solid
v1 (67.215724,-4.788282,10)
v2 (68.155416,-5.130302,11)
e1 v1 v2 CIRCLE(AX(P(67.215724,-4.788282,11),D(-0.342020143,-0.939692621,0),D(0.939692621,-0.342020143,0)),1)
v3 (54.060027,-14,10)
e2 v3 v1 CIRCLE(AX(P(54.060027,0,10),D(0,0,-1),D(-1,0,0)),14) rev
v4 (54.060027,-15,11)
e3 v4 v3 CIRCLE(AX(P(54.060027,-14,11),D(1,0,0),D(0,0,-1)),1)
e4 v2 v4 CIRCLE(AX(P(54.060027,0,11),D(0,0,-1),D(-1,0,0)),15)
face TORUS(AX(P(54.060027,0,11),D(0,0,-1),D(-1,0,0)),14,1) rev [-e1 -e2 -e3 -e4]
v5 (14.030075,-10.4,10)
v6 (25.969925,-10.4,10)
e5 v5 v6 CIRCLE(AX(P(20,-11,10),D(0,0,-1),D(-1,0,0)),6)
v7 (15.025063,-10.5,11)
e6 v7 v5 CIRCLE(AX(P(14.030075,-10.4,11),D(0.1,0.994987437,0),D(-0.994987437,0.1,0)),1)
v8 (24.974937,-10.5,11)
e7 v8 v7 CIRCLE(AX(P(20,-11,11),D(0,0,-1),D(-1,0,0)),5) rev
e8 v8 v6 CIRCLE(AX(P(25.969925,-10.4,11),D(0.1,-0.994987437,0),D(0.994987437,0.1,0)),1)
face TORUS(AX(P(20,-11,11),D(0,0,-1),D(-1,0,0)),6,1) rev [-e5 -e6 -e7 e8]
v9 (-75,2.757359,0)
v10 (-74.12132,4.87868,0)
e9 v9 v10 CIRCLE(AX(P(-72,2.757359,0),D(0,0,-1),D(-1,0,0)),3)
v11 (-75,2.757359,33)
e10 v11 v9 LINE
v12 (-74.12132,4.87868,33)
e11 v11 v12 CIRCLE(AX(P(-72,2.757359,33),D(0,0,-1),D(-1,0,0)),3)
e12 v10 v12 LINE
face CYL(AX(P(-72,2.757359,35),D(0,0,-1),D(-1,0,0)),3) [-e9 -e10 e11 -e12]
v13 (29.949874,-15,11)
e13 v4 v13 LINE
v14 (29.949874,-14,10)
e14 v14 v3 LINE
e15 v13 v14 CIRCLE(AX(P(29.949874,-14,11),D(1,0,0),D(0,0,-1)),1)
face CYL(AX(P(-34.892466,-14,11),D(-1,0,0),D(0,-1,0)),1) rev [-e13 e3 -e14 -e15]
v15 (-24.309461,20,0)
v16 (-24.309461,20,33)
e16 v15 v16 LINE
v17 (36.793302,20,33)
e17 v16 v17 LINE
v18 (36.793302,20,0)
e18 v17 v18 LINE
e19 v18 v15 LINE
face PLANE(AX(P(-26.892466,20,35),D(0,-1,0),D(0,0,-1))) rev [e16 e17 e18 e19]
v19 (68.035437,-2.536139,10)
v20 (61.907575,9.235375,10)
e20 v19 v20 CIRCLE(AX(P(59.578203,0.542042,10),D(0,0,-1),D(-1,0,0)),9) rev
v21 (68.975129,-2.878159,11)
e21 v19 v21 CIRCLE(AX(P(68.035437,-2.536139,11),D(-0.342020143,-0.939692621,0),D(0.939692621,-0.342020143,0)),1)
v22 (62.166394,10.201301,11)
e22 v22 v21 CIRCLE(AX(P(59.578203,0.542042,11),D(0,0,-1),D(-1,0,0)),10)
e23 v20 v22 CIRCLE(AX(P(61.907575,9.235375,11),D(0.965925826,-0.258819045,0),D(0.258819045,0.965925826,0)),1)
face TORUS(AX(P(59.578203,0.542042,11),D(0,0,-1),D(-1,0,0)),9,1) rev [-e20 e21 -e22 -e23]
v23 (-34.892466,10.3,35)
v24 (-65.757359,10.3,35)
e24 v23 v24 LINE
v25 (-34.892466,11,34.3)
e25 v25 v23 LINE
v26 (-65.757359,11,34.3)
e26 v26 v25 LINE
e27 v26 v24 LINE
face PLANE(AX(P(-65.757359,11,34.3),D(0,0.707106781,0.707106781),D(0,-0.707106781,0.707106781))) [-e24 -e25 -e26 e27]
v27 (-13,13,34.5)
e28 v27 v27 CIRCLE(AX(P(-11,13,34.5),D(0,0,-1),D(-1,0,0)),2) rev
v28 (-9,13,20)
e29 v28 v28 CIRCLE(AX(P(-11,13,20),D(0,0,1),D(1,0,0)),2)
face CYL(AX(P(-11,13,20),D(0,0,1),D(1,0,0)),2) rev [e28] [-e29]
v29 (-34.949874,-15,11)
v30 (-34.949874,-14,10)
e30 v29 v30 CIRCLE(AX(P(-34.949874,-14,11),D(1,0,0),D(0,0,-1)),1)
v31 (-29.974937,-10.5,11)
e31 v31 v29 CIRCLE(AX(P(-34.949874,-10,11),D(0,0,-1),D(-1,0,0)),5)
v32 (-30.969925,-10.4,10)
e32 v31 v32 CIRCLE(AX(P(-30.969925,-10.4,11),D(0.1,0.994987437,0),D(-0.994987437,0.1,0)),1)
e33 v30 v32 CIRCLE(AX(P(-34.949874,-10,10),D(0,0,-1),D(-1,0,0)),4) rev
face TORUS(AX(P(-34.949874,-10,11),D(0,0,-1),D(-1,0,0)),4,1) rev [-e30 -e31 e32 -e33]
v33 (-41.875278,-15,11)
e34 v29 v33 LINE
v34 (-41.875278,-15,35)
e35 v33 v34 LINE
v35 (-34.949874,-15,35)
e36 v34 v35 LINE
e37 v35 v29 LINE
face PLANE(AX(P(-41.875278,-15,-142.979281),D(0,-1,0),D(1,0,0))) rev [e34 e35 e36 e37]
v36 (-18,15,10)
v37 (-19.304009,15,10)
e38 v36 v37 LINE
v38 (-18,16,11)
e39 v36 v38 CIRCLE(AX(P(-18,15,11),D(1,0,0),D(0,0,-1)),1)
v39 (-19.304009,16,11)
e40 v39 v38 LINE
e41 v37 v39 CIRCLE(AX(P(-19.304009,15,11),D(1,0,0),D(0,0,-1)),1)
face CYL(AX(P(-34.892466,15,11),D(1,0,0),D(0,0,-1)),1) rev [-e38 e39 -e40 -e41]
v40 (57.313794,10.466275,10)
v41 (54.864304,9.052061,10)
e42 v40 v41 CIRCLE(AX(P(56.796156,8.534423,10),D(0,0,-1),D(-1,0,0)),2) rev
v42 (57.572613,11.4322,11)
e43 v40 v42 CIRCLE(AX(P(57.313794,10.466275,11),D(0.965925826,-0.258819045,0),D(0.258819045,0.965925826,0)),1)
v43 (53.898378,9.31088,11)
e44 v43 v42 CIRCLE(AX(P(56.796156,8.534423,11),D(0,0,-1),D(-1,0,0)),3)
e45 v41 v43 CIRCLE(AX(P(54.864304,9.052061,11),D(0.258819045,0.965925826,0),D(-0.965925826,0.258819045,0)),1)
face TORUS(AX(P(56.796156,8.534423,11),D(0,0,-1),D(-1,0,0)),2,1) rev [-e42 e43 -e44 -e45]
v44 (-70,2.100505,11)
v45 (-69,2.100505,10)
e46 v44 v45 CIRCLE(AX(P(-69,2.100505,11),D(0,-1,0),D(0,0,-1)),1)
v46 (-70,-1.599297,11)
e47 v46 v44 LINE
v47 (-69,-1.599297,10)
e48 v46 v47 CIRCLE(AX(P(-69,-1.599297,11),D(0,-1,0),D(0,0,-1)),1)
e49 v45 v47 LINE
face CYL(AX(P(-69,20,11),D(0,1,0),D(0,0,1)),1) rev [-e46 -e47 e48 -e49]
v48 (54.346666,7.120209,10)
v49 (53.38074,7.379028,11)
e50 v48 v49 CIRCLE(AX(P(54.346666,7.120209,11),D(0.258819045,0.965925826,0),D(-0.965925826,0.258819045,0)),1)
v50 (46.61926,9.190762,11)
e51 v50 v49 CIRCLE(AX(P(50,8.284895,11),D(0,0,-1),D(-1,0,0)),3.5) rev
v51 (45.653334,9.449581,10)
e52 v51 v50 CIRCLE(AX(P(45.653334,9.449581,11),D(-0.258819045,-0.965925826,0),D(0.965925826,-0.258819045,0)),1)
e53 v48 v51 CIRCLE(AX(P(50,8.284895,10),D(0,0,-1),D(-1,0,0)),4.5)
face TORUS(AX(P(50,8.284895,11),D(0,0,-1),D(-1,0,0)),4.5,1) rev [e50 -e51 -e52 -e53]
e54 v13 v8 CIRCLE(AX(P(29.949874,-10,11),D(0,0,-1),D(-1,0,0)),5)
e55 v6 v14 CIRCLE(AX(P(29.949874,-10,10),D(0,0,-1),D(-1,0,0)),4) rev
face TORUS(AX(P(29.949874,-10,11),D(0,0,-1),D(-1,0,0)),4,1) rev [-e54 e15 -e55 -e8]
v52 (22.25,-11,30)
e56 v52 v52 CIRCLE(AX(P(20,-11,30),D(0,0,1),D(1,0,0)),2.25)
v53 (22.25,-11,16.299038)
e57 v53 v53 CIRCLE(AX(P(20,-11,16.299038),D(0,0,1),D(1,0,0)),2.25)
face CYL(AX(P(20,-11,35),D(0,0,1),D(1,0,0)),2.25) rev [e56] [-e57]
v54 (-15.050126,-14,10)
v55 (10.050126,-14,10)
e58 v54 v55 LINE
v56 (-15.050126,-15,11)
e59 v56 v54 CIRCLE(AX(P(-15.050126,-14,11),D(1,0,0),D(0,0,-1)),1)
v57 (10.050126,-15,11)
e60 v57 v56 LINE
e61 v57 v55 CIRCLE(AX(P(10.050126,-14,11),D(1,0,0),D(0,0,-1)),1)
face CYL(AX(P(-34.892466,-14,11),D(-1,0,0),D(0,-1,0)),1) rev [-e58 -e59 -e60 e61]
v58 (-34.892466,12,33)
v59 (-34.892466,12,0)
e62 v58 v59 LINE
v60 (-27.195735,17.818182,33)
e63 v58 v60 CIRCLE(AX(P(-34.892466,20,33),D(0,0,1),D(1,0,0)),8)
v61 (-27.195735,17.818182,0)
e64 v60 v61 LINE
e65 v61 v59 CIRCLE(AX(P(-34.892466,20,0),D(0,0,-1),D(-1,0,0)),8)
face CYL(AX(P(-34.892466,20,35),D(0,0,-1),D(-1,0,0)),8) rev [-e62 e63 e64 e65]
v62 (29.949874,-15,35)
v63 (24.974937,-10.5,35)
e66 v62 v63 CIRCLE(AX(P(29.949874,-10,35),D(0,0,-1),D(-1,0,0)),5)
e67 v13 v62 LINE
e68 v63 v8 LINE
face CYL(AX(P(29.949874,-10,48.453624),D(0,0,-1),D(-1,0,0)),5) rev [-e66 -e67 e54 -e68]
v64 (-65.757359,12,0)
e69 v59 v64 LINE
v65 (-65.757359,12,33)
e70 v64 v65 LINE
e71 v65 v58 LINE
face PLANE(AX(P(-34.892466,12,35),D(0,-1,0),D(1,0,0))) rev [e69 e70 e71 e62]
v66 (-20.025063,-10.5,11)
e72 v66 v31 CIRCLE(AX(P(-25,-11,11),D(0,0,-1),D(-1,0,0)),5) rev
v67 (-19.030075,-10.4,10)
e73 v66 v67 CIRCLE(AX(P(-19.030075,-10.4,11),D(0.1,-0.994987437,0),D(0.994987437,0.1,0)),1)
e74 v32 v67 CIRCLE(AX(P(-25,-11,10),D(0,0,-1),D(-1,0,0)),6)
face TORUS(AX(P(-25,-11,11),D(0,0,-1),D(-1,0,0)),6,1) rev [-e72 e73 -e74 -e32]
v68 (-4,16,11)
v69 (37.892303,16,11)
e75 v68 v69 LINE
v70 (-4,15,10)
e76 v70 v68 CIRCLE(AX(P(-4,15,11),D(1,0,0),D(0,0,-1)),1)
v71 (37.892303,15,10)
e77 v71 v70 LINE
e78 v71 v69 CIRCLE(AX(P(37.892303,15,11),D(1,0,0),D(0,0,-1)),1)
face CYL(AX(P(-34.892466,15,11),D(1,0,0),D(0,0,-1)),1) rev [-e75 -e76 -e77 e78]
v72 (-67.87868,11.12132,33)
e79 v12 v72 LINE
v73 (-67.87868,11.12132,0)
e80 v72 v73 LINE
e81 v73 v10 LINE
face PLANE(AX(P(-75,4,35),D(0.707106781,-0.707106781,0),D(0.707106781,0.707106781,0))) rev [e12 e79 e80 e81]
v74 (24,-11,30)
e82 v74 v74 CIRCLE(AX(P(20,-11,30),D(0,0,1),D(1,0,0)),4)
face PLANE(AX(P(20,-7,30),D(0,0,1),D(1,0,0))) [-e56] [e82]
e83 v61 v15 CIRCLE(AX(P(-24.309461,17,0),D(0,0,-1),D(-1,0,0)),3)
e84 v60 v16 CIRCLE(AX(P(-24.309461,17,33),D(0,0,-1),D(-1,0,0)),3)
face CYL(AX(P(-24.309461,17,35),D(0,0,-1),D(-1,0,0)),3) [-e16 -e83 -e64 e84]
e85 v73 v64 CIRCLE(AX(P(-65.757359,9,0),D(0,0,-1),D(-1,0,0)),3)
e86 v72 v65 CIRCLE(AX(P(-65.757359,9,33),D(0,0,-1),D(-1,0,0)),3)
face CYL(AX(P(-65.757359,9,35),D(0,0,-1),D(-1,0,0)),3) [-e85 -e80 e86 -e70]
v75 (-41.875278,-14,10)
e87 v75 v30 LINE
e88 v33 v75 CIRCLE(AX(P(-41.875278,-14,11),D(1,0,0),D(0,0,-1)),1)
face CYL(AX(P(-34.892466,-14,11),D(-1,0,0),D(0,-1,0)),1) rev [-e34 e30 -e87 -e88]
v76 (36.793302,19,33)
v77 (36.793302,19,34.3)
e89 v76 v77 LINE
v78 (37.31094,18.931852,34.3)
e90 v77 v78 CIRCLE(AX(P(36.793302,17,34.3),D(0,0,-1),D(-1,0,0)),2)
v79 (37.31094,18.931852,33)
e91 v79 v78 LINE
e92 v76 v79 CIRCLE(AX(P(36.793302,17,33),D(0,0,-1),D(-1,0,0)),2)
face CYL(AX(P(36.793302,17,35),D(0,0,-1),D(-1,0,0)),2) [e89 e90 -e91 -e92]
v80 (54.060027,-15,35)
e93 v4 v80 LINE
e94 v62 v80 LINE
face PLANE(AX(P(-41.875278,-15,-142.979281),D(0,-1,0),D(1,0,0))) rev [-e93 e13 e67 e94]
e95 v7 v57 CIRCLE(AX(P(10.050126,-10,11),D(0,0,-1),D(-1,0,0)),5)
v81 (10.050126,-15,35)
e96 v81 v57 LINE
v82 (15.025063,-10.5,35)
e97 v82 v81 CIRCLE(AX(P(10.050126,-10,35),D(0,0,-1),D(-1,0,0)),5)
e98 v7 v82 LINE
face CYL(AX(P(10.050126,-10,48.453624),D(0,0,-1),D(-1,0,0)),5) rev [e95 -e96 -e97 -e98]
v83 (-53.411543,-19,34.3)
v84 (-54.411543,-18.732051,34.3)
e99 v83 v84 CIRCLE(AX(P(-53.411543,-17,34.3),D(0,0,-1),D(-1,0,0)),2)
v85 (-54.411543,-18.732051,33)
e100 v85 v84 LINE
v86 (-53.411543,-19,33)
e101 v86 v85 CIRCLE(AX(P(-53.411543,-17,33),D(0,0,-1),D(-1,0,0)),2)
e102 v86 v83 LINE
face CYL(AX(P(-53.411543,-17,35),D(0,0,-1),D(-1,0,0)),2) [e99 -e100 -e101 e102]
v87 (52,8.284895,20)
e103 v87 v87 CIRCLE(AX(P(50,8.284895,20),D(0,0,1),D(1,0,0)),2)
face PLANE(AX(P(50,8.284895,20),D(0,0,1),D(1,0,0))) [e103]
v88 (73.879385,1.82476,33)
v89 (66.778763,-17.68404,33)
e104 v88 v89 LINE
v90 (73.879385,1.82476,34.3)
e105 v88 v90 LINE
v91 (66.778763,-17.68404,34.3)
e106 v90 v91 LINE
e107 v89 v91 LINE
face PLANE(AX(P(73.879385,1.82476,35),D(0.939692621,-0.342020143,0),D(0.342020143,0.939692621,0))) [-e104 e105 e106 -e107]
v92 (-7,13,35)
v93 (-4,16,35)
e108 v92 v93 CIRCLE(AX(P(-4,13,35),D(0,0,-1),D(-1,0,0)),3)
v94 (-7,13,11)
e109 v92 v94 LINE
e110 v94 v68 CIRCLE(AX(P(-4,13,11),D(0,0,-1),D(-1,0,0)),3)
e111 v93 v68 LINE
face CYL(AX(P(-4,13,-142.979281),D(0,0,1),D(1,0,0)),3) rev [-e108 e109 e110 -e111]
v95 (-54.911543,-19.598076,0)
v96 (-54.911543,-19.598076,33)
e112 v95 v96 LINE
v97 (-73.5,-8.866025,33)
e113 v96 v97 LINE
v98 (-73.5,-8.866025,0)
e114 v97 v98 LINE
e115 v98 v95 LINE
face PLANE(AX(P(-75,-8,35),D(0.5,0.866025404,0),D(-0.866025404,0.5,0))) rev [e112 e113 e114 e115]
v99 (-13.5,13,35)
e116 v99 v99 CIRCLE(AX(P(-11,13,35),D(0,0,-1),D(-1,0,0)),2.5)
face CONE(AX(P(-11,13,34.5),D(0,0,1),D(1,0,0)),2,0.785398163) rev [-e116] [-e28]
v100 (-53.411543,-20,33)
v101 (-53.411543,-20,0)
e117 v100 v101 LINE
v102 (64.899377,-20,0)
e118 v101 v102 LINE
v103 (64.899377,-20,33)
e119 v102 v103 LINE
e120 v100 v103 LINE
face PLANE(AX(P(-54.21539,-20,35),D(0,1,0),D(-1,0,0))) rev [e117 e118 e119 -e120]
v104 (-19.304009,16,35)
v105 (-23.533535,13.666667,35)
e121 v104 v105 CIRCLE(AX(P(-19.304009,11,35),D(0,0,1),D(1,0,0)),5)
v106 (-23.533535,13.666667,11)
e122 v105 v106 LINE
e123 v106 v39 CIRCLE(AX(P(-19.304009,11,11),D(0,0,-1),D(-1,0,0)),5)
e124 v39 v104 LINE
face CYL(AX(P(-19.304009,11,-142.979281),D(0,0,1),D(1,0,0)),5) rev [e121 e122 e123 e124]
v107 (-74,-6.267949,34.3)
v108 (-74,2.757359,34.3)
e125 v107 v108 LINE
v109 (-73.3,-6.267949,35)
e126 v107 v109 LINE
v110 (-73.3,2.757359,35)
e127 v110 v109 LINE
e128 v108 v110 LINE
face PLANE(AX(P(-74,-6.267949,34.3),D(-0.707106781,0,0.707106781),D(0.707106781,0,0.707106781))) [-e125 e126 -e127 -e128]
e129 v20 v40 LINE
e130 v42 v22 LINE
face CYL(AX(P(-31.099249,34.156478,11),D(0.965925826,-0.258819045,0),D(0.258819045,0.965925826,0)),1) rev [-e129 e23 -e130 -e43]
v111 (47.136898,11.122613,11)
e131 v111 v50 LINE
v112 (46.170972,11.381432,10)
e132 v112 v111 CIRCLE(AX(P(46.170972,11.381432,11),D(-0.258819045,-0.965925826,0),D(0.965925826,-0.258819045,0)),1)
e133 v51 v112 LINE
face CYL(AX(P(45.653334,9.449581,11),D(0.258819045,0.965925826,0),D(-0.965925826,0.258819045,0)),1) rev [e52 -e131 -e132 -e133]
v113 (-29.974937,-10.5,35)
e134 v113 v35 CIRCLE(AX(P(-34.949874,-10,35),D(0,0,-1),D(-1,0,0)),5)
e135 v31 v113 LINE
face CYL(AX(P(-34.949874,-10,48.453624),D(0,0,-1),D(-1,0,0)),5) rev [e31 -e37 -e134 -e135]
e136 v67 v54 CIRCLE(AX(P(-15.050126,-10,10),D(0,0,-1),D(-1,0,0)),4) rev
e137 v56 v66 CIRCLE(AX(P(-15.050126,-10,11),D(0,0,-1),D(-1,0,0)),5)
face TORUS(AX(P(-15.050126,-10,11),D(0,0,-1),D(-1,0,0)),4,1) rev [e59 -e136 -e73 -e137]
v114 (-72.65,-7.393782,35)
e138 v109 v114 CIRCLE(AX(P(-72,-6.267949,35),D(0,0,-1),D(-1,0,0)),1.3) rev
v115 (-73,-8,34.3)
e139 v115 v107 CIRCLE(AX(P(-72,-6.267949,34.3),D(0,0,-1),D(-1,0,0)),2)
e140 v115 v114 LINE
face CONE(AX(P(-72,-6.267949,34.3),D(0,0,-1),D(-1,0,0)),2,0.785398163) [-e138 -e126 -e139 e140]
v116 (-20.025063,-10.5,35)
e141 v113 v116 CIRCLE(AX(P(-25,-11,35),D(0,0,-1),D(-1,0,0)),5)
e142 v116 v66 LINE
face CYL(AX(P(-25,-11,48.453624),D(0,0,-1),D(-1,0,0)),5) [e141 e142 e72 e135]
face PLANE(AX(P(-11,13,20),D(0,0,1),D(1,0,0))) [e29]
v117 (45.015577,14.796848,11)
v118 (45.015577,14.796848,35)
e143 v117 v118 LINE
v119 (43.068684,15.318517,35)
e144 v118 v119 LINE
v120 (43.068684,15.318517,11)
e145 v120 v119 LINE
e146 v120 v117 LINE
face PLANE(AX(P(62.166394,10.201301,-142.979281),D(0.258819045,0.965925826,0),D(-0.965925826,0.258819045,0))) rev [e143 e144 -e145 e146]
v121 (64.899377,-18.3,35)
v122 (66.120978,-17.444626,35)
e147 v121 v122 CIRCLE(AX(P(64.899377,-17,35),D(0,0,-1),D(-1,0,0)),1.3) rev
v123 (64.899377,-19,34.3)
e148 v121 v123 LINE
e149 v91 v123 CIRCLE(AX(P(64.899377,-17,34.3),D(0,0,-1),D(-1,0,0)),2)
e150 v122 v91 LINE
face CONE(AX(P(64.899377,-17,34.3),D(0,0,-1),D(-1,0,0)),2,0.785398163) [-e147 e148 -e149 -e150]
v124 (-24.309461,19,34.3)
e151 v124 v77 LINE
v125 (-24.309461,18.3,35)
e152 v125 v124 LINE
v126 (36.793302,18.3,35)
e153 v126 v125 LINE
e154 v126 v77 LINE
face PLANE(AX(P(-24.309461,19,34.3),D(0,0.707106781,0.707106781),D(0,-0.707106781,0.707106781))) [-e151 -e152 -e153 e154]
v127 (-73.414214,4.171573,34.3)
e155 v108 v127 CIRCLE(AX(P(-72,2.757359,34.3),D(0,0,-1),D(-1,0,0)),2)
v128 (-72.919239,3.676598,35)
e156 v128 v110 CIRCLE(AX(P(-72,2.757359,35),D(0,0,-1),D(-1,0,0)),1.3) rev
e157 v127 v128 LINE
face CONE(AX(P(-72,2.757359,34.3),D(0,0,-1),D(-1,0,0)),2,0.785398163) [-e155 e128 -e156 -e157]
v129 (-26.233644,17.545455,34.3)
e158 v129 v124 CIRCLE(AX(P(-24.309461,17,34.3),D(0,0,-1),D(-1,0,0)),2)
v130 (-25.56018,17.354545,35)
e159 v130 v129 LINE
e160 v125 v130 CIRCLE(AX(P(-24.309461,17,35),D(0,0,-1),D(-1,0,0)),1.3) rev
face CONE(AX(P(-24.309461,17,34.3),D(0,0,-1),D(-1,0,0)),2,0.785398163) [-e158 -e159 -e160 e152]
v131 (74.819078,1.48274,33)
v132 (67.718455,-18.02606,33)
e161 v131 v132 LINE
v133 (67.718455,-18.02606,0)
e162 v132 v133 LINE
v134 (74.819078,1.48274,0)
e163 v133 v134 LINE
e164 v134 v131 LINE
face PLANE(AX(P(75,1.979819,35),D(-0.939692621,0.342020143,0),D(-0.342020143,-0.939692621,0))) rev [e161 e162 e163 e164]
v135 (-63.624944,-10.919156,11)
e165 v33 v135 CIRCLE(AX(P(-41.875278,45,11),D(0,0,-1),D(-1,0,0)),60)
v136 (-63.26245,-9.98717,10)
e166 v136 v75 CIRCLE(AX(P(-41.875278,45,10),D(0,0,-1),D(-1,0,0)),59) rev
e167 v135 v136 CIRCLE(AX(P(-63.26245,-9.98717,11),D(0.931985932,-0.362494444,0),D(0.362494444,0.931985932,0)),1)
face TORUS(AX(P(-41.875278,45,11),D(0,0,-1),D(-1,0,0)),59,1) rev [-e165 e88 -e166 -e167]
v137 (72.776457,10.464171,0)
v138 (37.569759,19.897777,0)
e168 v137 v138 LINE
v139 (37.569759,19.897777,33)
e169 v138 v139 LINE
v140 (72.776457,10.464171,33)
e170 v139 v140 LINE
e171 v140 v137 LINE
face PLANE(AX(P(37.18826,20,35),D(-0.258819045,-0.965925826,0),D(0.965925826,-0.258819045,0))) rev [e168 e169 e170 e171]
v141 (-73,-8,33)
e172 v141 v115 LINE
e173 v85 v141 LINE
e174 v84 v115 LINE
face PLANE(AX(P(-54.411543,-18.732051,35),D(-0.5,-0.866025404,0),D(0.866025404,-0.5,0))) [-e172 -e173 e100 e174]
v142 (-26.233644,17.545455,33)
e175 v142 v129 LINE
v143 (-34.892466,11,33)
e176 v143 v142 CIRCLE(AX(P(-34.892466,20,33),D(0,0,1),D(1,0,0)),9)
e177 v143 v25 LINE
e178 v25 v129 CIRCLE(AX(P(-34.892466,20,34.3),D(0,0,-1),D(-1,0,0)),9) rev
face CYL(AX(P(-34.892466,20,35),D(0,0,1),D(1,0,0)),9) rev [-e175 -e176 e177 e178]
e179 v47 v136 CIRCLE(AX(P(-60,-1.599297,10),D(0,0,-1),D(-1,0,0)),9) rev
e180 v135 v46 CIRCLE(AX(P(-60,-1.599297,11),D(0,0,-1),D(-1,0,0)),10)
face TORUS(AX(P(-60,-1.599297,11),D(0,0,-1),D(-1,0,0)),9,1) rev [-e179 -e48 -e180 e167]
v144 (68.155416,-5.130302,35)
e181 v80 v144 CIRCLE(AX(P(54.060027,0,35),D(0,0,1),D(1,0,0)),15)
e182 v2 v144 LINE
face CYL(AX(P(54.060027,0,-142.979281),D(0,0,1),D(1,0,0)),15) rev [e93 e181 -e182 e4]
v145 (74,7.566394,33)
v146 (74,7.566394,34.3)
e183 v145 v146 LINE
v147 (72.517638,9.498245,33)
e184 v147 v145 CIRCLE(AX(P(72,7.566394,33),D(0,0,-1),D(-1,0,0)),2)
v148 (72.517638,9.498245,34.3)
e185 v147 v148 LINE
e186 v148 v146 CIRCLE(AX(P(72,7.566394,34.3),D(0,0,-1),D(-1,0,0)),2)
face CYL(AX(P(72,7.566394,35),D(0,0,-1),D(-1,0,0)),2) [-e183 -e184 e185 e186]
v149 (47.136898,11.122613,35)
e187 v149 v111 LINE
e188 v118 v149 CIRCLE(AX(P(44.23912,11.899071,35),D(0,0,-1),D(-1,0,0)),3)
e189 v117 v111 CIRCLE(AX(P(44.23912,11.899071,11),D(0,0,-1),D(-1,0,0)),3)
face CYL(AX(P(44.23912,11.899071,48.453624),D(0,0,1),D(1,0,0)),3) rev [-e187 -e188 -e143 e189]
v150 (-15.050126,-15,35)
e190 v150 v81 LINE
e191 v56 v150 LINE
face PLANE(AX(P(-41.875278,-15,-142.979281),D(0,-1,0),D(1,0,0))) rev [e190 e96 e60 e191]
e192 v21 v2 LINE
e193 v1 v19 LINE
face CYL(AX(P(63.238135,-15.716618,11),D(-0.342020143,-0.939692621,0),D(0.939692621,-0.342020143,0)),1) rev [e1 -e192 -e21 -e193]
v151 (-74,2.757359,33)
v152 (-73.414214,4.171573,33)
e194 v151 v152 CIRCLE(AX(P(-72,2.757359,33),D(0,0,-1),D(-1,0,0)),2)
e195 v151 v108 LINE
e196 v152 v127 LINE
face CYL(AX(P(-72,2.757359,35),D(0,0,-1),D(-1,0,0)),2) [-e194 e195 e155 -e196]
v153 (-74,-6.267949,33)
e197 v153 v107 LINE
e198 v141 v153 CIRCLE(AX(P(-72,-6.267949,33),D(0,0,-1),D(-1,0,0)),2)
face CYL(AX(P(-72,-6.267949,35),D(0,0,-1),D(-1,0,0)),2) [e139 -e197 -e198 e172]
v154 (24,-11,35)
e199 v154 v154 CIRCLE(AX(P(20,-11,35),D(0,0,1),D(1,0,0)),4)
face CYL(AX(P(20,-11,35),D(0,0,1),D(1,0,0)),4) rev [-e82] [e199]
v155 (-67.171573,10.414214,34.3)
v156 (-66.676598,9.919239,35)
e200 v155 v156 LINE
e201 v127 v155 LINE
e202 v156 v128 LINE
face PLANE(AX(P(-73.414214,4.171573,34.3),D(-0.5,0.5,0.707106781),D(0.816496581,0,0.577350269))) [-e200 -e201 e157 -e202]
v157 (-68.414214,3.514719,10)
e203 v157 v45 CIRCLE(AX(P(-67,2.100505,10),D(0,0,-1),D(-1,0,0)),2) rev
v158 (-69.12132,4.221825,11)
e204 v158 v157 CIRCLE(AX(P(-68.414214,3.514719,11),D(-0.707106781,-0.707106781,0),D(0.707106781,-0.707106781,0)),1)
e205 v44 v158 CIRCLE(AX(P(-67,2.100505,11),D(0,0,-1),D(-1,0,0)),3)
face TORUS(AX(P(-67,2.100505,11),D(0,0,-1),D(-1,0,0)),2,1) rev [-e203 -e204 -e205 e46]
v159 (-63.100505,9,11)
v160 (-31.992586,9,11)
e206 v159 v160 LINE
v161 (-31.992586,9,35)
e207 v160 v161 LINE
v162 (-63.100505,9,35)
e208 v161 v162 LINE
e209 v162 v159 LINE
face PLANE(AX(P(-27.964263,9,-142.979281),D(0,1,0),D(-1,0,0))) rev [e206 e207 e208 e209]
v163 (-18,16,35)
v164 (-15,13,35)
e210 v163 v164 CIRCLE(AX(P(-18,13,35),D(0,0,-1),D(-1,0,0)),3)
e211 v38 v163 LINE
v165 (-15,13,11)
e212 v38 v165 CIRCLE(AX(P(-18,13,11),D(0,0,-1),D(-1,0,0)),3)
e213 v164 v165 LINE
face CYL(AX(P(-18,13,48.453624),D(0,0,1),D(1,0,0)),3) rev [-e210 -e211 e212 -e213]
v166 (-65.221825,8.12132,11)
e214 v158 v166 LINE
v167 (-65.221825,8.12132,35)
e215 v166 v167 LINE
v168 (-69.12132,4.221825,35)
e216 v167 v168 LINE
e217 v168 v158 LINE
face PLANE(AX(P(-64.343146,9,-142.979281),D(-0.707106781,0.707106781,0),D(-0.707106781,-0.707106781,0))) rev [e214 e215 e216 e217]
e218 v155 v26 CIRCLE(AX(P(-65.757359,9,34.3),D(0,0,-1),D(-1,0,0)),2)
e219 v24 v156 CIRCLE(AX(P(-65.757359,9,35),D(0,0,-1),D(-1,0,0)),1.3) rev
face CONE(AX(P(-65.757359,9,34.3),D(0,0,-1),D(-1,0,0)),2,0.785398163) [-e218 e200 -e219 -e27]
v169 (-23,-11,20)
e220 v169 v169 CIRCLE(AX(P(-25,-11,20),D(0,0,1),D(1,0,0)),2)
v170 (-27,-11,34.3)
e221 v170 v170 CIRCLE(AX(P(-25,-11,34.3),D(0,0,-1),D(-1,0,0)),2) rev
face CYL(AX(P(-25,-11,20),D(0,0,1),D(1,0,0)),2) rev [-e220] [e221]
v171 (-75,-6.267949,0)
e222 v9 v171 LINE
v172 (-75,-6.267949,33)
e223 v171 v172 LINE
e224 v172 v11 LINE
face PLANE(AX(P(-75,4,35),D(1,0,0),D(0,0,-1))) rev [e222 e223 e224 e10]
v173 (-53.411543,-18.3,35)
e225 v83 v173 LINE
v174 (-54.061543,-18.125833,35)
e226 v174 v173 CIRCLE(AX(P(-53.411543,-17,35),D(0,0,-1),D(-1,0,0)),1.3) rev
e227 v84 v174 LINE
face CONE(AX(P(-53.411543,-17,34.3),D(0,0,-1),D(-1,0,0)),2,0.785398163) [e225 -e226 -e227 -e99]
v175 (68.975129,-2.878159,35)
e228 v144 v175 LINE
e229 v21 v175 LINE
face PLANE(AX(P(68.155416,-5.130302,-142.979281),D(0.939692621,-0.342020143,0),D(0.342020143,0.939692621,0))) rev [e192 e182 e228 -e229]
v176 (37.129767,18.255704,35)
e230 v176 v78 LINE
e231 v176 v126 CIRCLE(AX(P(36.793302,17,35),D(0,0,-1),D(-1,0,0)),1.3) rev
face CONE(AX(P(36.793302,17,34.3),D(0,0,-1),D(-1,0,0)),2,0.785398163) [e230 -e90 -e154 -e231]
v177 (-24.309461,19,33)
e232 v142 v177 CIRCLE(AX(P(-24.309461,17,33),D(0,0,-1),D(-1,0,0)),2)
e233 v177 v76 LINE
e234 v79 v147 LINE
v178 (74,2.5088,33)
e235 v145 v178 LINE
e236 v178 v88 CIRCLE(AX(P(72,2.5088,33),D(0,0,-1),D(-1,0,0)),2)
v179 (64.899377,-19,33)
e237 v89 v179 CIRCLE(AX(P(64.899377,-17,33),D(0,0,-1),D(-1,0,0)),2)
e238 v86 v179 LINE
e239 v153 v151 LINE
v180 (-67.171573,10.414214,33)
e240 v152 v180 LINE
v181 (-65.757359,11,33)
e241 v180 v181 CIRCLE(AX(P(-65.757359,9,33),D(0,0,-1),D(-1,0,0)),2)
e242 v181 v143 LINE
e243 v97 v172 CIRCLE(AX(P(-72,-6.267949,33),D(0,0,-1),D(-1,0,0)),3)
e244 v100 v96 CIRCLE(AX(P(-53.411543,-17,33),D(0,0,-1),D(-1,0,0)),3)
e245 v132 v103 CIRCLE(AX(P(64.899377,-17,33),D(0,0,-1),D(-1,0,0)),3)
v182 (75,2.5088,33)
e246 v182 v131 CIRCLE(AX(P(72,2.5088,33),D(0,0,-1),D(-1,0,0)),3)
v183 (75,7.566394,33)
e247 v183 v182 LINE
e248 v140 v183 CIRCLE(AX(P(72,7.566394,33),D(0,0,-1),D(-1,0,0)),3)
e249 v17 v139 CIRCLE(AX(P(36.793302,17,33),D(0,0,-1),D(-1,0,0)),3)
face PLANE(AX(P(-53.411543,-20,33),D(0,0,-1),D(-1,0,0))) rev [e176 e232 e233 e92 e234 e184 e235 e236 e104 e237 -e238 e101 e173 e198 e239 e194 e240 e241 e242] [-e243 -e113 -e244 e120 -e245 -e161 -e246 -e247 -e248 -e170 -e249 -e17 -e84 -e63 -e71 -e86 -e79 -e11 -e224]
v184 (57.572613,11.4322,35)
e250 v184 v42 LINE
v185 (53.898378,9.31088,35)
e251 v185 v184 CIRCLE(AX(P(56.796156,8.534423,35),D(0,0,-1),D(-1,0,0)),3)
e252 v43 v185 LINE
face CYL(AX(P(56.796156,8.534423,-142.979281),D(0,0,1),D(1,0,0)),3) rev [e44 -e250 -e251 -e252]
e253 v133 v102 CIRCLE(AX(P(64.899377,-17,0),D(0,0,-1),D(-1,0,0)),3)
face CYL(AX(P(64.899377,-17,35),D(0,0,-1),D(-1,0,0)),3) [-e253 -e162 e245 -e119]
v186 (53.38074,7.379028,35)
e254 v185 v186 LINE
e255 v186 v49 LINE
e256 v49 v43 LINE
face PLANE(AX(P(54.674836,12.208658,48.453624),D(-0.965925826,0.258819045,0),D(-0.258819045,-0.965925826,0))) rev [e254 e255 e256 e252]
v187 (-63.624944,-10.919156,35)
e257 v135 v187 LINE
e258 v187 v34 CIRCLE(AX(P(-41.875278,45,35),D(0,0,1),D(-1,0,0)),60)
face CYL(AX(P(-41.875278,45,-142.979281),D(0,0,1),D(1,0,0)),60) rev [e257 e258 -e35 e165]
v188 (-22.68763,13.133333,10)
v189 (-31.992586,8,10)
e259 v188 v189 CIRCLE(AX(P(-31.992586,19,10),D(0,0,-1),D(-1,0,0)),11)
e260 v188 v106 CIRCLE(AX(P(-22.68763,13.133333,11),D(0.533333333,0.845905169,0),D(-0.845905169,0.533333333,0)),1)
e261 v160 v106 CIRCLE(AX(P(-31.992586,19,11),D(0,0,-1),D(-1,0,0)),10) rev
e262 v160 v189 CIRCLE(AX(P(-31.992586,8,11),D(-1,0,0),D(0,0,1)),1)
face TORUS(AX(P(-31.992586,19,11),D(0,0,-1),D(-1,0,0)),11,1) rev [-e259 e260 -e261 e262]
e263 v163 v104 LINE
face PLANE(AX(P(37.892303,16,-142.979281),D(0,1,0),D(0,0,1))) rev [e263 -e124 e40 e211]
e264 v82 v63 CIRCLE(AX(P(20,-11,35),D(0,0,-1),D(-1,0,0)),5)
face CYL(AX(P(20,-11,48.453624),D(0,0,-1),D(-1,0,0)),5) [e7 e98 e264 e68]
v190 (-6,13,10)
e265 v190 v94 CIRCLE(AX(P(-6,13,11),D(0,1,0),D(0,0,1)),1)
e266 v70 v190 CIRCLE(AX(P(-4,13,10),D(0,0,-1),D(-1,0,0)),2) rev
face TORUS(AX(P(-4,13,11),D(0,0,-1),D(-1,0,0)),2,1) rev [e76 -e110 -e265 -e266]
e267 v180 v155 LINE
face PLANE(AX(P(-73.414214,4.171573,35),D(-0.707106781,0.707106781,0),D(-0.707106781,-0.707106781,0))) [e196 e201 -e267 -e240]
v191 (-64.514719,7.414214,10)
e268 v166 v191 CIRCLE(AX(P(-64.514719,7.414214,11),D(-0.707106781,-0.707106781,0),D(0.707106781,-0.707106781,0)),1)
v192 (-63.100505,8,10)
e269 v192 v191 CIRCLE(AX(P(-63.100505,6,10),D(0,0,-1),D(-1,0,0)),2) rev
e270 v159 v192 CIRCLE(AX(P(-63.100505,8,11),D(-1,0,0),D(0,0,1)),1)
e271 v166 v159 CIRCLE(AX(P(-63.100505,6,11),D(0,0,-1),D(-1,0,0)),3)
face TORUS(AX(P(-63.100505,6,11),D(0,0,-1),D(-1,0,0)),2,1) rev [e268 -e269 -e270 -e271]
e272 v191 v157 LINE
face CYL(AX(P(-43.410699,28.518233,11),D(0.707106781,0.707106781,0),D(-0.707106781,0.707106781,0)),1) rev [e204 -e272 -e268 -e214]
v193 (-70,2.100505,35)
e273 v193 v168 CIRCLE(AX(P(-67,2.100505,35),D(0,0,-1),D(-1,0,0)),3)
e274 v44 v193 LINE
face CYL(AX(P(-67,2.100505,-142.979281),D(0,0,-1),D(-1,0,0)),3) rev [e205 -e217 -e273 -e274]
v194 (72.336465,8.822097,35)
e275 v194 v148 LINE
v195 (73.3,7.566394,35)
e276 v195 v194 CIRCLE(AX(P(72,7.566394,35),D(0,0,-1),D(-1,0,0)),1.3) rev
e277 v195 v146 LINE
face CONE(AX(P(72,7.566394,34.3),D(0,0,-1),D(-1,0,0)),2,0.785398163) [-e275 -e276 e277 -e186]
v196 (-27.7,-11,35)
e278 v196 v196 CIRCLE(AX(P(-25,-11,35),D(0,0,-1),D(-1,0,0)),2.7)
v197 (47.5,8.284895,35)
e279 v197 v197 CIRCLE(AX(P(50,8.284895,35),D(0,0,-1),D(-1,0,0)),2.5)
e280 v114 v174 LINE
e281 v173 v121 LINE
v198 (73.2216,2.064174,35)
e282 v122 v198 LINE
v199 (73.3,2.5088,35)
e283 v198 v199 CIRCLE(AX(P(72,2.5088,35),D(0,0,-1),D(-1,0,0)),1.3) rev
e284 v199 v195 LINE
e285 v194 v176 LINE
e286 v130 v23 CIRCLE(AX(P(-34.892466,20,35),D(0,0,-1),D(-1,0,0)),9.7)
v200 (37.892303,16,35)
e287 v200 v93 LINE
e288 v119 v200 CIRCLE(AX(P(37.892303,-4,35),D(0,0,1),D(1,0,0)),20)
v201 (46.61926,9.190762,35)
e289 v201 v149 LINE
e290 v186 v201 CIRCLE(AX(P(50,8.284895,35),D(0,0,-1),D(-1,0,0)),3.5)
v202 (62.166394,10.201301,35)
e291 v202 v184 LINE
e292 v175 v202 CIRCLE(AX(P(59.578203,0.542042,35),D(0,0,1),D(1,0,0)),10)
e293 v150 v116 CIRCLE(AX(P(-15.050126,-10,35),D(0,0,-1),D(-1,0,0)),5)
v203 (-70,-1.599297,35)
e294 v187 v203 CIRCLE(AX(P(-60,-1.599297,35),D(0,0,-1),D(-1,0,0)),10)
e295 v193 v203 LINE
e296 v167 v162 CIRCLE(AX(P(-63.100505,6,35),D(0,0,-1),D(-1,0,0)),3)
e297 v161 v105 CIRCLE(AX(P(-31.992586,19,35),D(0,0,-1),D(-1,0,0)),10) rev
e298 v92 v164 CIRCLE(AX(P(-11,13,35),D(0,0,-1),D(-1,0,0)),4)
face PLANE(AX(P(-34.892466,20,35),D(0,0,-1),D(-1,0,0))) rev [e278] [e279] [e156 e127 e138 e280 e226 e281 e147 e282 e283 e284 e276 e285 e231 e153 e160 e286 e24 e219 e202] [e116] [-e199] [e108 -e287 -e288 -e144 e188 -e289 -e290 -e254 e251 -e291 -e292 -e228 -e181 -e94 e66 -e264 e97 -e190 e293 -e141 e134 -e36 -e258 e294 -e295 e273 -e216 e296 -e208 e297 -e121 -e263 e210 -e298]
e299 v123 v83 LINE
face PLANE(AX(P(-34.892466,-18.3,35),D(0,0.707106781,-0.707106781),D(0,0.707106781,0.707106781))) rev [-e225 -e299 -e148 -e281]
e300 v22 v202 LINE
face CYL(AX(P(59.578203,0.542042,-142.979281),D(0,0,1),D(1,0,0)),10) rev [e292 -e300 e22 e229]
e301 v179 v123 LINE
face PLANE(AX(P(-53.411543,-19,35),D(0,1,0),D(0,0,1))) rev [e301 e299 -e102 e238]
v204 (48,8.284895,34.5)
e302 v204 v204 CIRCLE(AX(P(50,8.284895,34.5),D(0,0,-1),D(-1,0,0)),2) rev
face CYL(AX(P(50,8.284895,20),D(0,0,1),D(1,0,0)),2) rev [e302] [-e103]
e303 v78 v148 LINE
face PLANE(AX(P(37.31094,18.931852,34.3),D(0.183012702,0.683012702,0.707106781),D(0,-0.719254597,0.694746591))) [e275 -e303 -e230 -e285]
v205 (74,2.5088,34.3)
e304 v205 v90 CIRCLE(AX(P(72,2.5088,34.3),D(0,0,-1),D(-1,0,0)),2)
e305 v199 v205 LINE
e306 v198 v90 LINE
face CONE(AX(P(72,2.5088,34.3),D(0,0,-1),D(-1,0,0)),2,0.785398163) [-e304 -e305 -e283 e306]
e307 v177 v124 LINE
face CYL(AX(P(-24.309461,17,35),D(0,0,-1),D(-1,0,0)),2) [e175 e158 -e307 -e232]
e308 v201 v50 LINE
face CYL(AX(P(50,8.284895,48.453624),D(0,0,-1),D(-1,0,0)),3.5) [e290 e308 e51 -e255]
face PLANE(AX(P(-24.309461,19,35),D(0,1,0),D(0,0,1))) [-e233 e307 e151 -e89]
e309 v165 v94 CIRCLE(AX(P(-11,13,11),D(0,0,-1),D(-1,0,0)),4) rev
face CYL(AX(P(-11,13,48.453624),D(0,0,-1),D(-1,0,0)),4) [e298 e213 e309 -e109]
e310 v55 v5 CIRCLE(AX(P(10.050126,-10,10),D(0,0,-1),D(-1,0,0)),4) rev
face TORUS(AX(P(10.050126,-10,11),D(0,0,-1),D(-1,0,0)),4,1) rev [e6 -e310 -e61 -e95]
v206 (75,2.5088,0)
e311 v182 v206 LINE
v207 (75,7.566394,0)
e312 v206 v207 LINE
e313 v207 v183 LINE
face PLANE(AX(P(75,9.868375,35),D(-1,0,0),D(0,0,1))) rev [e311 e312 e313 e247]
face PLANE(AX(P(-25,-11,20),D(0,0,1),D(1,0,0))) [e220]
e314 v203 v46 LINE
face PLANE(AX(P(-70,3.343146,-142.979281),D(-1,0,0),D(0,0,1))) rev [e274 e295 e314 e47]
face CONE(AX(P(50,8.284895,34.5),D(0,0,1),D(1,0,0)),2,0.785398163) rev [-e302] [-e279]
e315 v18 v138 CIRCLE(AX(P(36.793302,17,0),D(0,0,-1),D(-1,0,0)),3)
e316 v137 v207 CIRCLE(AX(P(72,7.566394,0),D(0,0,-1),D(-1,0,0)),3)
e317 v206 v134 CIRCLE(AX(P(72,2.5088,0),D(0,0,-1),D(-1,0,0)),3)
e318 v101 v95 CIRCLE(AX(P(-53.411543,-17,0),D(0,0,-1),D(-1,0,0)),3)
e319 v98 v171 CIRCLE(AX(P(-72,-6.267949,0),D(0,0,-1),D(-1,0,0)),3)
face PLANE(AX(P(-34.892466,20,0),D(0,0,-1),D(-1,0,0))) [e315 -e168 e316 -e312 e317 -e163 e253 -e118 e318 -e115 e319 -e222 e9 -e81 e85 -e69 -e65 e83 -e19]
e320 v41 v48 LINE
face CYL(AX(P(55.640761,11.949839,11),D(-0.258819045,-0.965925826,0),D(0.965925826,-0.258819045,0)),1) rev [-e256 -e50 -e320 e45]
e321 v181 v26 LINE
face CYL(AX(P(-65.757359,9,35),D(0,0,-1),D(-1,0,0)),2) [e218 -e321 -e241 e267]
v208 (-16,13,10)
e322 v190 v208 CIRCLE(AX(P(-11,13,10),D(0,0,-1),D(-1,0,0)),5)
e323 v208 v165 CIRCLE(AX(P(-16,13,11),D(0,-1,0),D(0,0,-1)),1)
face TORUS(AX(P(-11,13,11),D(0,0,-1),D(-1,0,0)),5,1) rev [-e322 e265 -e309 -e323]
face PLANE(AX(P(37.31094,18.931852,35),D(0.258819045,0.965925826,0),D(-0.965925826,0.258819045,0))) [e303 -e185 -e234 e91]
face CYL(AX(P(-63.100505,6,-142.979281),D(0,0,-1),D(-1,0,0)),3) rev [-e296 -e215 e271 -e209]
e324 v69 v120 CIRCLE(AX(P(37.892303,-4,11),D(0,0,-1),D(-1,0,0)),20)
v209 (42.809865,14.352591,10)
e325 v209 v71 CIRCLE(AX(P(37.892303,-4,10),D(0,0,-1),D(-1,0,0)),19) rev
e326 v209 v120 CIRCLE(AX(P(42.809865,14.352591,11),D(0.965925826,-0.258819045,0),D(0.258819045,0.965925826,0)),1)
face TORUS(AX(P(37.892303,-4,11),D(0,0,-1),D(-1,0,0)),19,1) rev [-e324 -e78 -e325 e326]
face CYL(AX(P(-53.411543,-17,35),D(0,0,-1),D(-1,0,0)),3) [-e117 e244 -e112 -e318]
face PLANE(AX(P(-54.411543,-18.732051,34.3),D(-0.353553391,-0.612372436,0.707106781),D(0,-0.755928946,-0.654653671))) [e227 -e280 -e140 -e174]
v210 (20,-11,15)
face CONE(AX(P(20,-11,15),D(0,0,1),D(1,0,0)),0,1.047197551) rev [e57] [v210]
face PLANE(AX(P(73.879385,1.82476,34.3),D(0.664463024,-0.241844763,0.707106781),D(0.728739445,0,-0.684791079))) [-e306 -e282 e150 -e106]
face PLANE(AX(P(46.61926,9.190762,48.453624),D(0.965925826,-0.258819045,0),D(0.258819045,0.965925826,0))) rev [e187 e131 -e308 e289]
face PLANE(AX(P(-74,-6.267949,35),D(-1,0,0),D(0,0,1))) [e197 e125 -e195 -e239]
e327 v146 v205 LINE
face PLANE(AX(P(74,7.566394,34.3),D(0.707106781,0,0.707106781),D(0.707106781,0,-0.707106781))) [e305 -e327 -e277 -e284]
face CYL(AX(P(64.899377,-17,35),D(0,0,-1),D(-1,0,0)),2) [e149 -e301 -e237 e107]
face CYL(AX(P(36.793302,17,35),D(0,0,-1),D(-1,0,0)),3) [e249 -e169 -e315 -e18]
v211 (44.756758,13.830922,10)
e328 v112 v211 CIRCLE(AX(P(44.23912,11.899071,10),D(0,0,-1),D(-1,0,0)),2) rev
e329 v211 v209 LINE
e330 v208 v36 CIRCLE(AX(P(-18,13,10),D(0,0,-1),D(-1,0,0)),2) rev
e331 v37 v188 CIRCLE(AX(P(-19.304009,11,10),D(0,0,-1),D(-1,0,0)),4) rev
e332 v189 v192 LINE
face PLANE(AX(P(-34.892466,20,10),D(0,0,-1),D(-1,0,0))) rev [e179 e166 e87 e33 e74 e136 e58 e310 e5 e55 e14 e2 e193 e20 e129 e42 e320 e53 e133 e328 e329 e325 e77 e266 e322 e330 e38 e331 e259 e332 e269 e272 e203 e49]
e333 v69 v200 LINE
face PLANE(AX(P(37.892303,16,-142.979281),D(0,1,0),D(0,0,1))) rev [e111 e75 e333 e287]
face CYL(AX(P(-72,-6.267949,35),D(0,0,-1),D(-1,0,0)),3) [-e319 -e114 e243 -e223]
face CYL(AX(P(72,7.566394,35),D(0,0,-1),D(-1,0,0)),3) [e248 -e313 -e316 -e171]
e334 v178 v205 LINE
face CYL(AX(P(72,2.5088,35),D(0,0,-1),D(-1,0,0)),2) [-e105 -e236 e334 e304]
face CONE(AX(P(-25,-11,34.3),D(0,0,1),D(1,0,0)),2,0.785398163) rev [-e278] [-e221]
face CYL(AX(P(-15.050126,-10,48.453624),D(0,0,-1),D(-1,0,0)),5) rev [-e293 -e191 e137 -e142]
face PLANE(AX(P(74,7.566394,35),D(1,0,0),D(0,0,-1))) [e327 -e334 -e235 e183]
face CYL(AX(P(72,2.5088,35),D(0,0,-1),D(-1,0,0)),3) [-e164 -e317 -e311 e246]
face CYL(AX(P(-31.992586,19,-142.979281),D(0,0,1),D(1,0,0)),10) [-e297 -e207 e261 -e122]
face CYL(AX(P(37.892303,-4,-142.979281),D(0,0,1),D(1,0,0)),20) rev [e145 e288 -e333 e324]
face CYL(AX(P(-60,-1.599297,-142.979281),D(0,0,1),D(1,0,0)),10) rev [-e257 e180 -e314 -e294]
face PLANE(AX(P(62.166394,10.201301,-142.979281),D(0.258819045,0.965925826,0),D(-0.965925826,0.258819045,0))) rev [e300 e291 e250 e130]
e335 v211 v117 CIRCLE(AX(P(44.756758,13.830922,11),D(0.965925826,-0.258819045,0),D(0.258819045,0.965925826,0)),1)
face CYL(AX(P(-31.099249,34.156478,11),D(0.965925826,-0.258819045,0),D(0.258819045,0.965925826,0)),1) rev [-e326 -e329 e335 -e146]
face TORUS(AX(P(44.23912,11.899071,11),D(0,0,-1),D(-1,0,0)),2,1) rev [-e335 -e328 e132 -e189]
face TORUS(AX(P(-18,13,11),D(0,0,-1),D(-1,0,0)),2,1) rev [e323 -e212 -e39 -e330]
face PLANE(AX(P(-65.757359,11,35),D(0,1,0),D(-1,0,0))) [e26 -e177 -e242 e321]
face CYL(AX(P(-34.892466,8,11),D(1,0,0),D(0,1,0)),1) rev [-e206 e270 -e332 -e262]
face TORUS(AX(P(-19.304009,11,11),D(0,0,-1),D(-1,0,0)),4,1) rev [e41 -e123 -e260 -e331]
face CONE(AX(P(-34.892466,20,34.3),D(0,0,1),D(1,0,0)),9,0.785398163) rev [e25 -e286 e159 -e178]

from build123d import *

# Parameters (mm, degrees)
EXTRUDE1_DEPTH     = 35
CUT_EXTRUDE1_DEPTH = 25
FILLET1_R          = 3
FILLET2_R          = 10
EXTRUDE2_DEPTH     = 25
FILLET3_R          = 5
FILLET4_R          = 3
CUT_SWEEP1_START   = 33
CUT_SWEEP1_DEPTH   = 2
CHAMFER1_SIZE      = 0.7
SKETCH6_R          = 2
CUT_EXTRUDE2_DEPTH = 15
CHAMFER2_SIZE      = 0.7
CHAMFER3_SIZE      = 0.5
FILLET5_R          = 1


# Read off the part's stored shape, not the designer's step: Cut-Sweep1
with BuildPart() as part:
    # Sketch1 → Extrude1 (new body)
    with BuildSketch(Plane.XY):
        with BuildLine():
            Line((-75, 4), (-67, 12))
            Line((-67, 12), (-34.892466166, 12))
            ThreePointArc((-34.892466166, 12), (-29.235611917, 14.343145751), (-26.892466166, 20))
            Line((-26.892466166, 20), (37.18825976, 20))
            Line((37.18825976, 20), (75, 9.868374738))
            Line((75, 9.868374738), (75, 1.979819356))
            Line((75, 1.979819356), (67, -20))
            Line((67, -20), (-54.215390309, -20))
            Line((-54.215390309, -20), (-75, -8))
            Line((-75, -8), (-75, 4))
        make_face()
    extrude(amount=EXTRUDE1_DEPTH)

    # Sketch2 → Cut-Extrude1 (cut)
    with BuildSketch(Plane.XY.offset(35)):
        with BuildLine():
            Line((-41.875277779, -15), (54.060027008, -15))
            ThreePointArc((54.060027008, -15), (62.663673554, -12.287280664), (68.15541632, -5.13030215))
            Line((68.15541632, -5.13030215), (68.975129378, -2.878159034))
            ThreePointArc((68.975129378, -2.878159034), (68.448311502, 5.159528532), (62.166393621, 10.201300662))
            Line((62.166393621, 10.201300662), (43.068684025, 15.318516526))
            ThreePointArc((43.068684025, 15.318516526), (40.502826968, 15.828897227), (37.892303123, 16))
            Line((37.892303123, 16), (-19.304008898, 16))
            ThreePointArc((-19.304008898, 16), (-21.804008898, 15.330127019), (-23.634135917, 13.5))
            ThreePointArc((-23.634135917, 13.5), (-25.524969168, 10.986121811), (-27.964262936, 9))
            Line((-27.964262936, 9), (-64.343145751, 9))
            Line((-64.343145751, 9), (-70, 3.343145751))
            Line((-70, 3.343145751), (-70, -8))
            ThreePointArc((-70, -8), (-56.366654525, -13.223706512), (-41.875277779, -15))
        make_face()
    extrude(amount=-CUT_EXTRUDE1_DEPTH, mode=Mode.SUBTRACT)

    # Fillet1
    fillet1_edges = [part.edges().sort_by_distance(p)[0] for p in [
        (-75, -8, 17.5),
        (-75, 4, 17.5),
        (-67, 12, 17.5),
        (-26.892466166, 20, 17.5),
        (37.18825976, 20, 17.5),
        (75, 9.868374738, 17.5),
        (75, 1.979819356, 17.5),
        (67, -20, 17.5),
        (-54.215390309, -20, 17.5),
    ]]
    fillet(fillet1_edges, radius=FILLET1_R)

    # Fillet2
    fillet2_edges = [part.edges().sort_by_distance(p)[0] for p in [
        (-27.964262936, 9, 22.5),
        (-70, -8, 22.5),
    ]]
    fillet(fillet2_edges, radius=FILLET2_R)

    # Sketch3 → Extrude2 (add)
    with BuildSketch(Plane.XY.offset(10)):
        with BuildLine():
            Line((-30, -11), (-30, -15))
            Line((-30, -15), (-20, -15))
            Line((-20, -15), (-20, -11))
            ThreePointArc((-20, -11), (-25, -6), (-30, -11))
        make_face()
        with BuildLine():
            Line((-15, 13), (-15, 16))
            Line((-15, 16), (-7, 16))
            Line((-7, 16), (-7, 13))
            ThreePointArc((-7, 13), (-11, 9), (-15, 13))
        make_face()
        with BuildLine():
            Line((15, -15), (15, -11))
            ThreePointArc((15, -11), (20, -6), (25, -11))
            Line((25, -11), (25, -15))
            Line((25, -15), (15, -15))
        make_face()
        with BuildLine():
            Line((46.619259608, 9.190761764), (47.913354834, 14.020390895))
            Line((47.913354834, 14.020390895), (54.674835618, 12.208657579))
            Line((54.674835618, 12.208657579), (53.380740392, 7.379028448))
            ThreePointArc((53.380740392, 7.379028448), (49.094133342, 4.904154714), (46.619259608, 9.190761764))
        make_face()
    extrude(amount=EXTRUDE2_DEPTH)

    # Fillet3
    fillet3_edges = [part.edges().sort_by_distance(p)[0] for p in [
        (-30, -15, 22.5),
        (-20, -15, 22.5),
        (15, -15, 22.5),
        (25, -15, 22.5),
    ]]
    fillet(fillet3_edges, radius=FILLET3_R)

    # Fillet4
    fillet4_edges = [part.edges().sort_by_distance(p)[0] for p in [
        (54.674835618, 12.208657579, 22.5),
        (47.913354834, 14.020390895, 22.5),
        (-70, 3.343145751, 22.5),
        (-64.343145751, 9, 22.5),
        (-15, 16, 22.5),
        (-7, 16, 22.5),
    ]]
    fillet(fillet4_edges, radius=FILLET4_R - 0.0001)  # a hair under: the kernel refuses the full size

    # Cut-Sweep1 outline → Cut-Sweep1 (cut)
    with BuildSketch(Plane.XY.offset(CUT_SWEEP1_START)):
        with BuildLine():
            ThreePointArc((64.899377385, -20), (66.620106694, -19.457456133), (67.718455248, -18.02606043))
            Line((67.718455248, -18.02606043), (74.819077862, 1.482739868))
            ThreePointArc((74.819077862, 1.482739868), (74.954423259, 1.987855765), (75, 2.508800298))
            Line((75, 2.508800298), (75, 7.566393774))
            ThreePointArc((75, 7.566393774), (74.380060021, 9.392678061), (72.776457135, 10.464171253))
            Line((72.776457135, 10.464171253), (37.569759403, 19.897777479))
            ThreePointArc((37.569759403, 19.897777479), (37.184880844, 19.974334584), (36.793302267, 20))
            Line((36.793302267, 20), (-24.309460922, 20))
            ThreePointArc((-24.309460922, 20), (-26.118528989, 19.393172106), (-27.195735079, 17.818181818))
            ThreePointArc((-27.195735079, 17.818181818), (-30.068284653, 13.618207718), (-34.892466166, 12))
            Line((-34.892466166, 12), (-65.757359313, 12))
            ThreePointArc((-65.757359313, 12), (-66.90540961, 11.771638598), (-67.878679656, 11.121320344))
            Line((-67.878679656, 11.121320344), (-74.121320344, 4.878679656))
            ThreePointArc((-74.121320344, 4.878679656), (-74.771638598, 3.90540961), (-75, 2.757359313))
            Line((-75, 2.757359313), (-75, -6.267949192))
            ThreePointArc((-75, -6.267949192), (-74.598076211, -7.767949192), (-73.5, -8.866025404))
            Line((-73.5, -8.866025404), (-54.911542732, -19.598076211))
            ThreePointArc((-54.911542732, -19.598076211), (-54.187999867, -19.897777479), (-53.411542732, -20))
            Line((-53.411542732, -20), (64.899377385, -20))
        make_face()
        with BuildLine():
            Line((73.879385242, 1.824760011), (66.778762627, -17.684040287))
            ThreePointArc((66.778762627, -17.684040287), (66.046530258, -18.638304089), (64.899377385, -19))
            Line((64.899377385, -19), (-53.411542732, -19))
            ThreePointArc((-53.411542732, -19), (-53.929180822, -18.931851653), (-54.411542732, -18.732050808))
            Line((-54.411542732, -18.732050808), (-73, -8))
            ThreePointArc((-73, -8), (-73.732050808, -7.267949192), (-74, -6.267949192))
            Line((-74, -6.267949192), (-74, 2.757359313))
            ThreePointArc((-74, 2.757359313), (-73.847759065, 3.522726178), (-73.414213562, 4.171572875))
            Line((-73.414213562, 4.171572875), (-67.171572875, 10.414213562))
            ThreePointArc((-67.171572875, 10.414213562), (-66.522726178, 10.847759065), (-65.757359313, 11))
            Line((-65.757359313, 11), (-34.892466166, 11))
            ThreePointArc((-34.892466166, 11), (-29.465261964, 12.820483683), (-26.233643694, 17.545454545))
            ThreePointArc((-26.233643694, 17.545454545), (-25.5155063, 18.59544807), (-24.309460922, 19))
            Line((-24.309460922, 19), (36.793302267, 19))
            ThreePointArc((36.793302267, 19), (37.054354652, 18.982889723), (37.310940358, 18.931851653))
            Line((37.310940358, 18.931851653), (72.51763809, 9.498245427))
            ThreePointArc((72.51763809, 9.498245427), (73.586706681, 8.783916632), (74, 7.566393774))
            Line((74, 7.566393774), (74, 2.508800298))
            ThreePointArc((74, 2.508800298), (73.969615506, 2.161503943), (73.879385242, 1.824760011))
        make_face(mode=Mode.SUBTRACT)
    extrude(amount=CUT_SWEEP1_DEPTH, mode=Mode.SUBTRACT)

    # Chamfer1
    chamfer1_edges = [part.edges().sort_by_distance(p)[0] for p in [
        (-53.929180822, -18.931851653, 35),
        (-63.705771366, -13.366025404, 35),
        (-73.732050808, -7.267949192, 35),
        (-74, -1.755294939, 35),
        (-73.847759065, 3.522726178, 35),
        (-70.292893218, 7.292893218, 35),
        (-66.522726178, 10.847759065, 35),
        (-50.324912739, 11, 35),
        (-29.465261964, 12.820483683, 35),
        (-25.5155063, 18.59544807, 35),
        (6.241920673, 19, 35),
        (37.054354652, 18.982889723, 35),
        (54.914289224, 14.21504854, 35),
        (73.586706681, 8.783916632, 35),
        (74, 5.037597036, 35),
        (73.969615506, 2.161503943, 35),
        (70.329073935, -7.929640138, 35),
        (66.046530258, -18.638304089, 35),
        (5.743917326, -19, 35),
    ]]
    chamfer(chamfer1_edges, length=CHAMFER1_SIZE)

    # Sketch5 → Cut-Revolve1 (revolve, cut)
    with BuildSketch(Plane(origin=(20, 0, 0), x_dir=(0, 0, -1), z_dir=(1, 0, 0)), mode=Mode.PRIVATE) as cut_revolve1_sk:
        Polygon((-35, -11), (-35, -7), (-30, -7), (-30, -8.75), (-16.299038106, -8.75), (-15, -11), align=None)
    revolve(cut_revolve1_sk.sketch.rotate(Axis((20, -11, 35), (0, 0, -1)), 90), axis=Axis((20, -11, 35), (0, 0, -1)), mode=Mode.SUBTRACT)

    # Sketch6 → Cut-Extrude2 (cut)
    with BuildSketch(Plane.XY.offset(35)):
        with Locations((-25, -11)):
            Circle(SKETCH6_R)
        with Locations((-11, 13)):
            Circle(SKETCH6_R)
        with Locations((50, 8.284895106)):
            Circle(SKETCH6_R)
    extrude(amount=-CUT_EXTRUDE2_DEPTH, mode=Mode.SUBTRACT)

    # Chamfer2
    chamfer2_edges = [part.edges().sort_by_distance(p)[0] for p in [
        (-27, -11, 35),
    ]]
    chamfer(chamfer2_edges, length=CHAMFER2_SIZE)

    # Chamfer3
    chamfer3_edges = [part.edges().sort_by_distance(p)[0] for p in [
        (-13, 13, 35),
        (48, 8.284895106, 35),
    ]]
    chamfer(chamfer3_edges, length=CHAMFER3_SIZE)

    # Fillet5
    fillet5_edges = [part.edges().sort_by_distance(p)[0] for p in [
        (-52.939875471, -13.970964702, 10),
        (-47.546566462, 9, 10),
        (-68.253770182, -7.245116104, 10),
        (-27.162127523, 10.244049642, 10),
        (-11, 9, 10),
        (53.639572378, 8.345002571, 10),
        (49.094133342, 4.904154714, 10),
        (-2.5, -15, 10),
        (-25, -6, 10),
        (20, -6, 10),
        (42.00495069, -15, 10),
        (-18.404227595, -13.708099244, 10),
        (-31.595772405, -13.708099244, 10),
        (26.595772405, -13.708099244, 10),
        (13.404227595, -13.708099244, 10),
        (-70, 0.250624938, 10),
        (-67.171572875, 6.171572875, 10),
        (46.878091594, 10.156735886, 10),
        (44.042178986, 15.057669337, 10),
        (-18.651954449, 16, 10),
        (46.837232303, 13.399091262, 10),
        (55.29613525, 11.132535049, 10),
        (-6.121349633, 15.121349633, 10),
        (-15.878650367, 15.121349633, 10),
        (-64.248558513, 8.77164621, 10),
        (-69.77164621, 3.248558513, 10),
        (59.869455062, 10.816763494, 10),
        (40.502826968, 15.828897227, 10),
        (16.946101562, 16, 10),
        (-21.719238356, 15.377975179, 10),
        (-38.412576075, -15, 10),
        (62.663673554, -12.287280664, 10),
        (68.565272849, -4.004230592, 10),
        (68.448311502, 5.159528532, 10),
    ]]
    fillet(fillet5_edges, radius=FILLET5_R)


solid = part.part
